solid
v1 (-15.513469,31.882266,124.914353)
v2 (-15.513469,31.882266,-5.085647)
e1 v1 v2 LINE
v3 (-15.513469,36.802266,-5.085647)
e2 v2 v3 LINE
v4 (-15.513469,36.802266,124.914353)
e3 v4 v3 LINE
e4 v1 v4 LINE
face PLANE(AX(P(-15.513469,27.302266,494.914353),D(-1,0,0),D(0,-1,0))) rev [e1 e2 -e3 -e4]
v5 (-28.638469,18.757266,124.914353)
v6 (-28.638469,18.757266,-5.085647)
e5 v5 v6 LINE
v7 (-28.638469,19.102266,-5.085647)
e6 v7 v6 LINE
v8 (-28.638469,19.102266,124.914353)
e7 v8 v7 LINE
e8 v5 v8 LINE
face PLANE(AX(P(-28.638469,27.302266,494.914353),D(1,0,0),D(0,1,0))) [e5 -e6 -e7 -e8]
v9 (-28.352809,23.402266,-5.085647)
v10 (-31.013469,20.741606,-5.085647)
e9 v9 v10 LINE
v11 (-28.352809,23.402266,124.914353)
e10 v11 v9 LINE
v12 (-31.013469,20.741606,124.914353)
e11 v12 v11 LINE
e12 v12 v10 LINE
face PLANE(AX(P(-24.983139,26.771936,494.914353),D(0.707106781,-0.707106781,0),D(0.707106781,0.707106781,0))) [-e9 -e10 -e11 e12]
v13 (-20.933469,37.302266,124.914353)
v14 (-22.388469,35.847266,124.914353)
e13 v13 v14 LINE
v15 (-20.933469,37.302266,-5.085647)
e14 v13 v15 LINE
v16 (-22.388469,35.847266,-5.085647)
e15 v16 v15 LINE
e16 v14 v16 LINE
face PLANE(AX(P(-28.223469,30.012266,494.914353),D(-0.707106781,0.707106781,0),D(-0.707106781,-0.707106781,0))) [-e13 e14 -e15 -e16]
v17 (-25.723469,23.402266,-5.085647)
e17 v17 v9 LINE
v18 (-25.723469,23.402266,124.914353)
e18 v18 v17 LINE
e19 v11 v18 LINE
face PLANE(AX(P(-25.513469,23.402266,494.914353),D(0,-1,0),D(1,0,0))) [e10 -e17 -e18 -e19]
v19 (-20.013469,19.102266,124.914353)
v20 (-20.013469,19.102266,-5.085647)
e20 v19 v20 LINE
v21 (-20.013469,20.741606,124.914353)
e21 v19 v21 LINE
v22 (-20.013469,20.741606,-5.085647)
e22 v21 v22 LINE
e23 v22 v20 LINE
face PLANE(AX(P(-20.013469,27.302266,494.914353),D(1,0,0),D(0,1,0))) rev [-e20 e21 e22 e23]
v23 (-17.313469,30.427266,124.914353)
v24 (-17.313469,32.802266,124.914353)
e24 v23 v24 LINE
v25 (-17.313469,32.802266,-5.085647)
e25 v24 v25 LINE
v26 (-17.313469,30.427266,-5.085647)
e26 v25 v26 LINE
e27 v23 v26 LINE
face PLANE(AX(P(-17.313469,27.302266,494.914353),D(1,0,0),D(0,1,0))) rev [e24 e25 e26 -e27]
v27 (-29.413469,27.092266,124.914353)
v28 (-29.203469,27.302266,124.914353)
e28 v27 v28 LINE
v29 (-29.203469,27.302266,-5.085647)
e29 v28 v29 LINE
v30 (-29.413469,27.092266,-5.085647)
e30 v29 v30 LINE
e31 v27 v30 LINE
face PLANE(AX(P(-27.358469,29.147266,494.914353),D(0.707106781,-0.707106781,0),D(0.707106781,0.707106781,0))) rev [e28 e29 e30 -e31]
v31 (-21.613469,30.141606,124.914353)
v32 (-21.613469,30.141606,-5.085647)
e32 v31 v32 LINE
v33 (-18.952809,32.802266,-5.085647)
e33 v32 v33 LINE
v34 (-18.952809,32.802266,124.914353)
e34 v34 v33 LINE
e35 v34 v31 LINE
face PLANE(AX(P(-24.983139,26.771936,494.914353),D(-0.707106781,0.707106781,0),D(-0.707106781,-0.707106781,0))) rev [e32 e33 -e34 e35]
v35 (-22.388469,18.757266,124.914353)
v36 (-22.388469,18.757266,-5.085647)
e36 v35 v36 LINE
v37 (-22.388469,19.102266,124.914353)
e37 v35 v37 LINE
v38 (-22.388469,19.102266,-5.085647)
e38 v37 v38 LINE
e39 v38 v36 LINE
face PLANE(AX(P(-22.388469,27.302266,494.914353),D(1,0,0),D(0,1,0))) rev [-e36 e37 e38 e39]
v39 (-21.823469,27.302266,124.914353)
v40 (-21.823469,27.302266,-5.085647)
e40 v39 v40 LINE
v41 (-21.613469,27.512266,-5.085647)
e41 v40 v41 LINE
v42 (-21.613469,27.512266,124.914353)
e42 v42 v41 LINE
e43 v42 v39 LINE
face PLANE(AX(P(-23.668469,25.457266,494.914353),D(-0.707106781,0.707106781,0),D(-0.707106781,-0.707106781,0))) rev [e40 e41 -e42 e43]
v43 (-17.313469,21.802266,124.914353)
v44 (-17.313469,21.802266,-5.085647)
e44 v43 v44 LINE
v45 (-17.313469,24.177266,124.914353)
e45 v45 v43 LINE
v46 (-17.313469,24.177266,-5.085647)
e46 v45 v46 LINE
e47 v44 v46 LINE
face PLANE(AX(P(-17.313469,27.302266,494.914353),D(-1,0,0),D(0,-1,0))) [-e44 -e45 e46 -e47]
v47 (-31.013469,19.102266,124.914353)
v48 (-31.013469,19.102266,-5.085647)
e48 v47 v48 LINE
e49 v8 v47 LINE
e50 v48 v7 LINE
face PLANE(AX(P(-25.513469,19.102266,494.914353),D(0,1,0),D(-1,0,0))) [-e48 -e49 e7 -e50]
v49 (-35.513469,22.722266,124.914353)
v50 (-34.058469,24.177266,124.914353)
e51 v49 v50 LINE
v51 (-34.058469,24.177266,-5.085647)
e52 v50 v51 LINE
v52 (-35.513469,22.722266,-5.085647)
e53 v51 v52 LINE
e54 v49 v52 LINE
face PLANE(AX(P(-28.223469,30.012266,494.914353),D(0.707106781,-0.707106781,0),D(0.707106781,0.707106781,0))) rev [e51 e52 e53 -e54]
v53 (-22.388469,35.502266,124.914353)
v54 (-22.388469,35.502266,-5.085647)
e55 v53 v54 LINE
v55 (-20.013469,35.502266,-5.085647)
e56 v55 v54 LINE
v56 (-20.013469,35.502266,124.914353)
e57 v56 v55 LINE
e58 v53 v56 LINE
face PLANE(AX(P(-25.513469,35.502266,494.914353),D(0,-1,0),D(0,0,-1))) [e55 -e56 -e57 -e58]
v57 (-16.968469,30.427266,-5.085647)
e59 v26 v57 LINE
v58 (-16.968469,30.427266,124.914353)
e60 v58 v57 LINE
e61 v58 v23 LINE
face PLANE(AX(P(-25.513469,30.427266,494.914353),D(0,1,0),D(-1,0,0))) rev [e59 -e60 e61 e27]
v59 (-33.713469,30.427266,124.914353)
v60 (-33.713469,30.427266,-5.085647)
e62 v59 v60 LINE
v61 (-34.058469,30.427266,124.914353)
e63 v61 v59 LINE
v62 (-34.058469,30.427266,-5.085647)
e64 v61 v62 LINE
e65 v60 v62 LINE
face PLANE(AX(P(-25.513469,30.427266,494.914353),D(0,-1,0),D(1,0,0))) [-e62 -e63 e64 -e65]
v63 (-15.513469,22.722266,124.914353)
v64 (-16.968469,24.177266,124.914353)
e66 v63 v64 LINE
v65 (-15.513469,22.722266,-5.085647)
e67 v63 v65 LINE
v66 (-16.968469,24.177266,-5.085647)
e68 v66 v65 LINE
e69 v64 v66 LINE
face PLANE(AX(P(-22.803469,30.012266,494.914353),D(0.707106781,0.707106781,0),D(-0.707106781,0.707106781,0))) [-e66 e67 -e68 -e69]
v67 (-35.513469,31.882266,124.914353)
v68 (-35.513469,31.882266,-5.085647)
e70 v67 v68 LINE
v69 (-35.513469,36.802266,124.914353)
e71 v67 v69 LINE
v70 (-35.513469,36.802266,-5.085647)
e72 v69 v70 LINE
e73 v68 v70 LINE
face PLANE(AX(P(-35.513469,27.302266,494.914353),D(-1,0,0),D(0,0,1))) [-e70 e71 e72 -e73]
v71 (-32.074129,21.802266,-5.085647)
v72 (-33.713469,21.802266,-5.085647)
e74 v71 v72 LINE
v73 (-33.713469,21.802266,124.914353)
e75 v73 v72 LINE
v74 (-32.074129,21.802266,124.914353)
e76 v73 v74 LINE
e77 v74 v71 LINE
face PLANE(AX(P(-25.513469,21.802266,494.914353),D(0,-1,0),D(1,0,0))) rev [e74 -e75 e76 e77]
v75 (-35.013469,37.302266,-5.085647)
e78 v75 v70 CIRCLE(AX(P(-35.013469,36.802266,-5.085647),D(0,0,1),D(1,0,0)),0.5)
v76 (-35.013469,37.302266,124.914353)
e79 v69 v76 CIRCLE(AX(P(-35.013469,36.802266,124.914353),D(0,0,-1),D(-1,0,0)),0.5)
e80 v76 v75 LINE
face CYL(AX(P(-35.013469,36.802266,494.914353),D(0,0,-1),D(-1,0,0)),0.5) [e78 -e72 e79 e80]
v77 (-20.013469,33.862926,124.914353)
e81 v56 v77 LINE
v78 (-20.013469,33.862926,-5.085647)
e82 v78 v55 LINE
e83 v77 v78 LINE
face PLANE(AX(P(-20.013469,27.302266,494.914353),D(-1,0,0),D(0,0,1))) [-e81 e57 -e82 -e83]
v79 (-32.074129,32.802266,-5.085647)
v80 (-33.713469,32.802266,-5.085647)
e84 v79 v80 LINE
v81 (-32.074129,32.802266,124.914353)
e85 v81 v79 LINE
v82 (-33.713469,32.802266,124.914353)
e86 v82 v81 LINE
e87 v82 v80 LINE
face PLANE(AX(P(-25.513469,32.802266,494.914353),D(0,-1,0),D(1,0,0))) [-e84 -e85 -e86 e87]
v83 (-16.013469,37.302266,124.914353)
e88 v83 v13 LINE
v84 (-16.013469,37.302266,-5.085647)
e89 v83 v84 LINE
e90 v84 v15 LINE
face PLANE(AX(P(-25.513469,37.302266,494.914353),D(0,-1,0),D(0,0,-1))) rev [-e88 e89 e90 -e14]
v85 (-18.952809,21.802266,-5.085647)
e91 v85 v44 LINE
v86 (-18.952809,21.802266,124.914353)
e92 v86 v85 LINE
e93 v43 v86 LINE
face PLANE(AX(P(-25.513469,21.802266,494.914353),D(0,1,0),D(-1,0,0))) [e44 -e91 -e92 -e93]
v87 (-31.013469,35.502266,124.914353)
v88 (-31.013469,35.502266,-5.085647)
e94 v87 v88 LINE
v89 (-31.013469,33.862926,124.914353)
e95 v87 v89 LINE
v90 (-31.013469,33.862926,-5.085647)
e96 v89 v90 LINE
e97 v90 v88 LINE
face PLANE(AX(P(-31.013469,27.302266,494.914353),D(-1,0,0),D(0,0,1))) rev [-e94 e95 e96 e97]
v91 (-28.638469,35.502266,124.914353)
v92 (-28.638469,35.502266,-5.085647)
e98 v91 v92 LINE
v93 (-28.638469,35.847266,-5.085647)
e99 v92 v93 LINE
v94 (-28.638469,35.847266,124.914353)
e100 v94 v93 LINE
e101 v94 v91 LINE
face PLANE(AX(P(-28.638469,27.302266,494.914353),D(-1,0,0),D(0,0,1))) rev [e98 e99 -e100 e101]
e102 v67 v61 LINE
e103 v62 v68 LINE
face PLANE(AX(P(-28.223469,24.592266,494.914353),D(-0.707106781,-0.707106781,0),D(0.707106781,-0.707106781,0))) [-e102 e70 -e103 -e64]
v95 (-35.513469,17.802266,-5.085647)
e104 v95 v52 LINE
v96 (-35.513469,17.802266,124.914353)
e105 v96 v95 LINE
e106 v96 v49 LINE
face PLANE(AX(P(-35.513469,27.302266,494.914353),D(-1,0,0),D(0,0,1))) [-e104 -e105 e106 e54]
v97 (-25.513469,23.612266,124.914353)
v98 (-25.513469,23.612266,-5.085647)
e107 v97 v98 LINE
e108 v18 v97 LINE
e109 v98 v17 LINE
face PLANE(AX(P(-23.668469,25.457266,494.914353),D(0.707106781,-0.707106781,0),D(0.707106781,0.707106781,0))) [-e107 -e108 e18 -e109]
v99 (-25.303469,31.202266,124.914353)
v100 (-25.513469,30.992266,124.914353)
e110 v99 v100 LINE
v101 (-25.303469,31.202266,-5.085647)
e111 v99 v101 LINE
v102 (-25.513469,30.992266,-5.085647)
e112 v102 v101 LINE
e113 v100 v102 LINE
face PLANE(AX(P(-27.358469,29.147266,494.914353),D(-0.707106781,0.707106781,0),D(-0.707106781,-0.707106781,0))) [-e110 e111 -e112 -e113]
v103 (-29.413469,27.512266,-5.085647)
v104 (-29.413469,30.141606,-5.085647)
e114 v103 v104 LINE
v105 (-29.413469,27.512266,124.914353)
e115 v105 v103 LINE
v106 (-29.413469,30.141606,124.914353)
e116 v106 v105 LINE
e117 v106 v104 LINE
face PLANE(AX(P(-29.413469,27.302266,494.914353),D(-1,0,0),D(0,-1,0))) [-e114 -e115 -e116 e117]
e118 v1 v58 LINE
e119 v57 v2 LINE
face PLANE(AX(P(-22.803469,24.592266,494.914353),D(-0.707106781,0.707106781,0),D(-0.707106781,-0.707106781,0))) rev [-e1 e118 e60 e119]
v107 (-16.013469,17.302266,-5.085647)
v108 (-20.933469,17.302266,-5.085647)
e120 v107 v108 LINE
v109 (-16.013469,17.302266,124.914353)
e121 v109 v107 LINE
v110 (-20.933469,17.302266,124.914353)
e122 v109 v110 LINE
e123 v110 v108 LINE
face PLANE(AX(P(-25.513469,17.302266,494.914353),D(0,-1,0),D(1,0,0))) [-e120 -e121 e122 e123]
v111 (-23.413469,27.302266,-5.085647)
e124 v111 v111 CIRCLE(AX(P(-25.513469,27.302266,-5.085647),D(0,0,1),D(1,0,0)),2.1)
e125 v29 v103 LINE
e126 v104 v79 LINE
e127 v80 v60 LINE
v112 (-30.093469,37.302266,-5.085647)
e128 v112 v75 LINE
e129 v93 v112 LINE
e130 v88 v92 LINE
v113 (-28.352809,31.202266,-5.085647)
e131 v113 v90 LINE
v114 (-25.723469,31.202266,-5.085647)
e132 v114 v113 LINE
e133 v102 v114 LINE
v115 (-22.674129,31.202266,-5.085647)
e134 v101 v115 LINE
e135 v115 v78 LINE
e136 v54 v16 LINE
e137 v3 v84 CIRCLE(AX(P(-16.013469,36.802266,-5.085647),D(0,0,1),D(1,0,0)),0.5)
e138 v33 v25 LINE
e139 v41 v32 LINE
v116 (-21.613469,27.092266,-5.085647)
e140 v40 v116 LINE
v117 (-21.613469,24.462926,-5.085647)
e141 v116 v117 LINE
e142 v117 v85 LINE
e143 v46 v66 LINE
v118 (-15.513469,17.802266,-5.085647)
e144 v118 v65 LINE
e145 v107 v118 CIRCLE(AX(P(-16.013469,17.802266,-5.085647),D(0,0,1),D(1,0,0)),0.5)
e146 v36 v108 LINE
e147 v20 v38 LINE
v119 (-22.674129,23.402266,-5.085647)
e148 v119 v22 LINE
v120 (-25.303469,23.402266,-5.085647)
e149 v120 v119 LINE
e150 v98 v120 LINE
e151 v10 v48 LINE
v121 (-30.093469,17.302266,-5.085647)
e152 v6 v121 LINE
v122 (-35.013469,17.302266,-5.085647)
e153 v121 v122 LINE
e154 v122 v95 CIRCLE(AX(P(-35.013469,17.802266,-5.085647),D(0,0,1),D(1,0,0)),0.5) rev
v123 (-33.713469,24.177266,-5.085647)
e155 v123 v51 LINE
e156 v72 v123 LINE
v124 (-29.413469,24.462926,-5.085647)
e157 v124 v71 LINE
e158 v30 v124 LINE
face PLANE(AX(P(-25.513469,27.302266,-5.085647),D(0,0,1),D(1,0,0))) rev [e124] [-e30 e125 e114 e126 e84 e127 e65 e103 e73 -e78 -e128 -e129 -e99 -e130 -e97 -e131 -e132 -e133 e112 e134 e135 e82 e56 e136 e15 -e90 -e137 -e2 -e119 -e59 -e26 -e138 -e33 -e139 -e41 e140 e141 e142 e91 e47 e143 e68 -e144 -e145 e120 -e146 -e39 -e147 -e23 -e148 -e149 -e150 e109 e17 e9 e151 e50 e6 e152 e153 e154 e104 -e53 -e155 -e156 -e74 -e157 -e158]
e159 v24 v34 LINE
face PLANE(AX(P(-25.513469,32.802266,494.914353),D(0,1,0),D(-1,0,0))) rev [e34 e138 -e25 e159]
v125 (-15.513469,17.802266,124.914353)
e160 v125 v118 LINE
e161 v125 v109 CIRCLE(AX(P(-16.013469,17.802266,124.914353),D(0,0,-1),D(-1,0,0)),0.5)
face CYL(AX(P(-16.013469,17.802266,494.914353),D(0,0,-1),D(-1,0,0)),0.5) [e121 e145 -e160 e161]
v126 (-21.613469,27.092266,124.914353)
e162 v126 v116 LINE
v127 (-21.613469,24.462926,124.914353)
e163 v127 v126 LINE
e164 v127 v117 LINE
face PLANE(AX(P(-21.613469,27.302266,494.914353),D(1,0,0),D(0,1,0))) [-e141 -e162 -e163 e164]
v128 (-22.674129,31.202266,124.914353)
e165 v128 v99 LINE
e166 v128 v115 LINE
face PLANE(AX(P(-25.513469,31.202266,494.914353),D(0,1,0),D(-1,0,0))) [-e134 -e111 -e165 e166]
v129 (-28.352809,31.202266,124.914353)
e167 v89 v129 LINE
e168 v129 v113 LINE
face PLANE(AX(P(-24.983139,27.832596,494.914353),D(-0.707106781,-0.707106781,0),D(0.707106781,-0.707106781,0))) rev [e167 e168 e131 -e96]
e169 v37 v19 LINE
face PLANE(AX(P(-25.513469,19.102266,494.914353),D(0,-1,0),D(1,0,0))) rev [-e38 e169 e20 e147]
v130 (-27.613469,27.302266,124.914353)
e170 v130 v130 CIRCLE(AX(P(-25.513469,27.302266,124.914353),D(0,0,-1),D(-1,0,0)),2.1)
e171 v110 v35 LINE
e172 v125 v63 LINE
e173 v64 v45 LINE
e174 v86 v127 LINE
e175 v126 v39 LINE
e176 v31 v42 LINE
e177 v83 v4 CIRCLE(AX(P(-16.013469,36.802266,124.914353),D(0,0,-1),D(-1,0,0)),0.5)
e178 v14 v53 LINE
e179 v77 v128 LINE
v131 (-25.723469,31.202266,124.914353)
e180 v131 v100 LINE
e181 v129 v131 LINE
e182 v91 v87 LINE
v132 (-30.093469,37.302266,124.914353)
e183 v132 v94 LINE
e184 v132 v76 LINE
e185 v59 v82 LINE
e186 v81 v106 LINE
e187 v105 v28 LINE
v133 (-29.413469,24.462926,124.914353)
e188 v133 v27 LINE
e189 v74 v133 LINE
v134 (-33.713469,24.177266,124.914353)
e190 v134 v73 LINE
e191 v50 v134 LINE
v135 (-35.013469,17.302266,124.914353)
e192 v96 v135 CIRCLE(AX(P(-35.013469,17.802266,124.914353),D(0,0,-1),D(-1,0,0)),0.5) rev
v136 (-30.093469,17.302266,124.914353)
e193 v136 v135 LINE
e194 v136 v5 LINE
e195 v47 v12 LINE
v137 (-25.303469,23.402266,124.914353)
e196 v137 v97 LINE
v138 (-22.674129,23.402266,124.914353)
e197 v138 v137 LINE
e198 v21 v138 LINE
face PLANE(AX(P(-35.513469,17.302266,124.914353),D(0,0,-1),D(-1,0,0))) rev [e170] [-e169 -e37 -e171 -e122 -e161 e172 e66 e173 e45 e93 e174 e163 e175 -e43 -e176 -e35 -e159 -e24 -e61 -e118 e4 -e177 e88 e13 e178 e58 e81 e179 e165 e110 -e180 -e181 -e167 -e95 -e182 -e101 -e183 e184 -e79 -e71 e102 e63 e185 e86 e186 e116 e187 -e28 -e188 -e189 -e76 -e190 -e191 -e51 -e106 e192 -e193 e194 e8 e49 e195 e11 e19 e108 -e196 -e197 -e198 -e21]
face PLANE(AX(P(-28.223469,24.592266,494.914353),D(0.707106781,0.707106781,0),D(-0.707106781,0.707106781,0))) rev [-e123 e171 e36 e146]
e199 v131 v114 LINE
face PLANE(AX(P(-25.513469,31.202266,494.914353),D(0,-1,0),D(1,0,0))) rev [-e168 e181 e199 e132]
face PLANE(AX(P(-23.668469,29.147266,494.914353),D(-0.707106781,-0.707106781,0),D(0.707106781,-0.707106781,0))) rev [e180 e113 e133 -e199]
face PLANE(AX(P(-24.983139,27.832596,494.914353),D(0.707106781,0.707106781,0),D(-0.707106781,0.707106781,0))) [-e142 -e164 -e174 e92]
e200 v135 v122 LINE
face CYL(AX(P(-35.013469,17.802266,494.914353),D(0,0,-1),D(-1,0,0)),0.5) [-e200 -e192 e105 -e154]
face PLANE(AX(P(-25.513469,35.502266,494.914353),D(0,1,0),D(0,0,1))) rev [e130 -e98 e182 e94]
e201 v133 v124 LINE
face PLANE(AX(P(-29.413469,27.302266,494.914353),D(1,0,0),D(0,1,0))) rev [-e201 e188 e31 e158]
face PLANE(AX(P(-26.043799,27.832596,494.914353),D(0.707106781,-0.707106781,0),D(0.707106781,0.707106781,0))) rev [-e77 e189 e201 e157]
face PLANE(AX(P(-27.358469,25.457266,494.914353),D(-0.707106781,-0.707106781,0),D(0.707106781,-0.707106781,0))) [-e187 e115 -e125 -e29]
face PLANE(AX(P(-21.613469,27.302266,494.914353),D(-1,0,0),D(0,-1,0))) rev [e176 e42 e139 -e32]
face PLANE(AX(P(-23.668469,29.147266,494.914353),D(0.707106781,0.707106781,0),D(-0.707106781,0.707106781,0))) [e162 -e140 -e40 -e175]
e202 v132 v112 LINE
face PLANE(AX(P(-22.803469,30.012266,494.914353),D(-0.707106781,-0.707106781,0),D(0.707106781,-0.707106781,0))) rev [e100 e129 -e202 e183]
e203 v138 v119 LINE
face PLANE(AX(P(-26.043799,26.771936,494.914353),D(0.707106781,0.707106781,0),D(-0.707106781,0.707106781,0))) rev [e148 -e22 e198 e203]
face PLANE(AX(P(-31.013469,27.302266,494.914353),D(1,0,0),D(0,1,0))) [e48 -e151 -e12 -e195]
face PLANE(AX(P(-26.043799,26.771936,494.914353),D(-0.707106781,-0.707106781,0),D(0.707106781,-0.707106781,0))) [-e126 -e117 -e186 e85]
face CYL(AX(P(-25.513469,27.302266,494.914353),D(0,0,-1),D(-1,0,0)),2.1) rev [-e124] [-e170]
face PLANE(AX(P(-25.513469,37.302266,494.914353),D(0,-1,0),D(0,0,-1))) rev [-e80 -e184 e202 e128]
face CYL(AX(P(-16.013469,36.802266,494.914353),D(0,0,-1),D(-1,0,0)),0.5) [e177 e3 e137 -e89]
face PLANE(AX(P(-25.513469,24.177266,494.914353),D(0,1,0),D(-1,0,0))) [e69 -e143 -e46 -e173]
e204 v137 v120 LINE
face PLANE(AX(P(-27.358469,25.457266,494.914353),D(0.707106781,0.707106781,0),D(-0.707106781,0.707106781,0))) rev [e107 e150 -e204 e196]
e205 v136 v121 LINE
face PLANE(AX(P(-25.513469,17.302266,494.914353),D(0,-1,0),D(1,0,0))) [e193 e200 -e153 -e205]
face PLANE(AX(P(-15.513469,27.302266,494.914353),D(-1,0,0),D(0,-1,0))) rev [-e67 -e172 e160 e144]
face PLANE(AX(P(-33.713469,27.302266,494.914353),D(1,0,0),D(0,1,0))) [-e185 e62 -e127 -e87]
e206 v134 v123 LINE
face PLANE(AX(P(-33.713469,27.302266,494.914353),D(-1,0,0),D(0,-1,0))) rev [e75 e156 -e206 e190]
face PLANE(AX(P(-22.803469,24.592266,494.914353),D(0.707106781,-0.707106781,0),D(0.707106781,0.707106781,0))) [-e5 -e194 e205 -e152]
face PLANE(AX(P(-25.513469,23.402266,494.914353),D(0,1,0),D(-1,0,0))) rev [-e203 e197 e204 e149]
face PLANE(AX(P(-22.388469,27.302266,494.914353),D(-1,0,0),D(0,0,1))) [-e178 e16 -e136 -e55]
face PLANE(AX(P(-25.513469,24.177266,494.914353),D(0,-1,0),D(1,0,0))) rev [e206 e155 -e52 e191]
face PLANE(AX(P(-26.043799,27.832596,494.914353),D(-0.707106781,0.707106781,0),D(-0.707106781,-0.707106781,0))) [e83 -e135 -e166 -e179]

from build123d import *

# Parameters (mm, degrees)
V_SLOT_START                           = -5.085646751
V_SLOT_20X20X500_LINEAR_RAIL_OUTLINE_R = 2.1
V_SLOT_20X20X500_LINEAR_RAIL_DEPTH     = 500
SKETCH1_W                              = 20
SKETCH1_H                              = 370
CUT_EXTRUDE1_DEPTH                     = 497.589794047


# Read off the part's stored shape, not the designer's step: V-Slot 20x20x500 Linear Rail
with BuildPart() as part:
    # V-Slot 20x20x500 Linear Rail outline → V-Slot 20x20x500 Linear Rail (new body)
    with BuildSketch(Plane.XY.offset(V_SLOT_START)):
        with BuildLine():
            Line((-21.613469268, 24.462926439), (-21.613469268, 27.092266268))
            Line((-21.613469268, 27.092266268), (-21.823469268, 27.302266268))
            Line((-21.823469268, 27.302266268), (-21.613469268, 27.512266268))
            Line((-21.613469268, 27.512266268), (-21.613469268, 30.141606096))
            Line((-21.613469268, 30.141606096), (-18.952809096, 32.802266268))
            Line((-18.952809096, 32.802266268), (-17.313469268, 32.802266268))
            Line((-17.313469268, 32.802266268), (-17.313469268, 30.427266268))
            Line((-17.313469268, 30.427266268), (-16.968469268, 30.427266268))
            Line((-16.968469268, 30.427266268), (-15.513469268, 31.882266268))
            Line((-15.513469268, 31.882266268), (-15.513469268, 36.802266268))
            ThreePointArc((-15.513469268, 36.802266268), (-15.659915878, 37.155819658), (-16.013469268, 37.302266268))
            Line((-16.013469268, 37.302266268), (-20.933469268, 37.302266268))
            Line((-20.933469268, 37.302266268), (-22.388469268, 35.847266268))
            Line((-22.388469268, 35.847266268), (-22.388469268, 35.502266268))
            Line((-22.388469268, 35.502266268), (-20.013469268, 35.502266268))
            Line((-20.013469268, 35.502266268), (-20.013469268, 33.862926439))
            Line((-20.013469268, 33.862926439), (-22.67412944, 31.202266268))
            Line((-22.67412944, 31.202266268), (-25.303469268, 31.202266268))
            Line((-25.303469268, 31.202266268), (-25.513469268, 30.992266268))
            Line((-25.513469268, 30.992266268), (-25.723469268, 31.202266268))
            Line((-25.723469268, 31.202266268), (-28.352809096, 31.202266268))
            Line((-28.352809096, 31.202266268), (-31.013469268, 33.862926439))
            Line((-31.013469268, 33.862926439), (-31.013469268, 35.502266268))
            Line((-31.013469268, 35.502266268), (-28.638469268, 35.502266268))
            Line((-28.638469268, 35.502266268), (-28.638469268, 35.847266268))
            Line((-28.638469268, 35.847266268), (-30.093469268, 37.302266268))
            Line((-30.093469268, 37.302266268), (-35.013469268, 37.302266268))
            ThreePointArc((-35.013469268, 37.302266268), (-35.367022659, 37.155819658), (-35.513469268, 36.802266268))
            Line((-35.513469268, 36.802266268), (-35.513469268, 31.882266268))
            Line((-35.513469268, 31.882266268), (-34.058469268, 30.427266268))
            Line((-34.058469268, 30.427266268), (-33.713469268, 30.427266268))
            Line((-33.713469268, 30.427266268), (-33.713469268, 32.802266268))
            Line((-33.713469268, 32.802266268), (-32.07412944, 32.802266268))
            Line((-32.07412944, 32.802266268), (-29.413469268, 30.141606096))
            Line((-29.413469268, 30.141606096), (-29.413469268, 27.512266268))
            Line((-29.413469268, 27.512266268), (-29.203469268, 27.302266268))
            Line((-29.203469268, 27.302266268), (-29.413469268, 27.092266268))
            Line((-29.413469268, 27.092266268), (-29.413469268, 24.462926439))
            Line((-29.413469268, 24.462926439), (-32.07412944, 21.802266268))
            Line((-32.07412944, 21.802266268), (-33.713469268, 21.802266268))
            Line((-33.713469268, 21.802266268), (-33.713469268, 24.177266268))
            Line((-33.713469268, 24.177266268), (-34.058469268, 24.177266268))
            Line((-34.058469268, 24.177266268), (-35.513469268, 22.722266268))
            Line((-35.513469268, 22.722266268), (-35.513469268, 17.802266268))
            ThreePointArc((-35.513469268, 17.802266268), (-35.367022659, 17.448712877), (-35.013469268, 17.302266268))
            Line((-35.013469268, 17.302266268), (-30.093469268, 17.302266268))
            Line((-30.093469268, 17.302266268), (-28.638469268, 18.757266268))
            Line((-28.638469268, 18.757266268), (-28.638469268, 19.102266268))
            Line((-28.638469268, 19.102266268), (-31.013469268, 19.102266268))
            Line((-31.013469268, 19.102266268), (-31.013469268, 20.741606096))
            Line((-31.013469268, 20.741606096), (-28.352809096, 23.402266268))
            Line((-28.352809096, 23.402266268), (-25.723469268, 23.402266268))
            Line((-25.723469268, 23.402266268), (-25.513469268, 23.612266268))
            Line((-25.513469268, 23.612266268), (-25.303469268, 23.402266268))
            Line((-25.303469268, 23.402266268), (-22.67412944, 23.402266268))
            Line((-22.67412944, 23.402266268), (-20.013469268, 20.741606096))
            Line((-20.013469268, 20.741606096), (-20.013469268, 19.102266268))
            Line((-20.013469268, 19.102266268), (-22.388469268, 19.102266268))
            Line((-22.388469268, 19.102266268), (-22.388469268, 18.757266268))
            Line((-22.388469268, 18.757266268), (-20.933469268, 17.302266268))
            Line((-20.933469268, 17.302266268), (-16.013469268, 17.302266268))
            ThreePointArc((-16.013469268, 17.302266268), (-15.659915877, 17.448712878), (-15.513469268, 17.802266268))
            Line((-15.513469268, 17.802266268), (-15.513469268, 22.722266268))
            Line((-15.513469268, 22.722266268), (-16.968469268, 24.177266268))
            Line((-16.968469268, 24.177266268), (-17.313469268, 24.177266268))
            Line((-17.313469268, 24.177266268), (-17.313469268, 21.802266268))
            Line((-17.313469268, 21.802266268), (-18.952809096, 21.802266268))
            Line((-18.952809096, 21.802266268), (-21.613469268, 24.462926439))
        make_face()
        with Locations((-25.513469268, 27.302266268)):
            Circle(V_SLOT_20X20X500_LINEAR_RAIL_OUTLINE_R, mode=Mode.SUBTRACT)
    extrude(amount=V_SLOT_20X20X500_LINEAR_RAIL_DEPTH)

    # Sketch1 → Cut-Extrude1 (cut, through all)
    with BuildSketch(Plane(origin=(0, 37.302266268, 0), x_dir=(1, 0, 0), z_dir=(0, 1, 0))):
        with Locations((-25.513469268, -309.914353249)):
            Rectangle(SKETCH1_W, SKETCH1_H)
    extrude(amount=-CUT_EXTRUDE1_DEPTH, mode=Mode.SUBTRACT)


solid = part.part
